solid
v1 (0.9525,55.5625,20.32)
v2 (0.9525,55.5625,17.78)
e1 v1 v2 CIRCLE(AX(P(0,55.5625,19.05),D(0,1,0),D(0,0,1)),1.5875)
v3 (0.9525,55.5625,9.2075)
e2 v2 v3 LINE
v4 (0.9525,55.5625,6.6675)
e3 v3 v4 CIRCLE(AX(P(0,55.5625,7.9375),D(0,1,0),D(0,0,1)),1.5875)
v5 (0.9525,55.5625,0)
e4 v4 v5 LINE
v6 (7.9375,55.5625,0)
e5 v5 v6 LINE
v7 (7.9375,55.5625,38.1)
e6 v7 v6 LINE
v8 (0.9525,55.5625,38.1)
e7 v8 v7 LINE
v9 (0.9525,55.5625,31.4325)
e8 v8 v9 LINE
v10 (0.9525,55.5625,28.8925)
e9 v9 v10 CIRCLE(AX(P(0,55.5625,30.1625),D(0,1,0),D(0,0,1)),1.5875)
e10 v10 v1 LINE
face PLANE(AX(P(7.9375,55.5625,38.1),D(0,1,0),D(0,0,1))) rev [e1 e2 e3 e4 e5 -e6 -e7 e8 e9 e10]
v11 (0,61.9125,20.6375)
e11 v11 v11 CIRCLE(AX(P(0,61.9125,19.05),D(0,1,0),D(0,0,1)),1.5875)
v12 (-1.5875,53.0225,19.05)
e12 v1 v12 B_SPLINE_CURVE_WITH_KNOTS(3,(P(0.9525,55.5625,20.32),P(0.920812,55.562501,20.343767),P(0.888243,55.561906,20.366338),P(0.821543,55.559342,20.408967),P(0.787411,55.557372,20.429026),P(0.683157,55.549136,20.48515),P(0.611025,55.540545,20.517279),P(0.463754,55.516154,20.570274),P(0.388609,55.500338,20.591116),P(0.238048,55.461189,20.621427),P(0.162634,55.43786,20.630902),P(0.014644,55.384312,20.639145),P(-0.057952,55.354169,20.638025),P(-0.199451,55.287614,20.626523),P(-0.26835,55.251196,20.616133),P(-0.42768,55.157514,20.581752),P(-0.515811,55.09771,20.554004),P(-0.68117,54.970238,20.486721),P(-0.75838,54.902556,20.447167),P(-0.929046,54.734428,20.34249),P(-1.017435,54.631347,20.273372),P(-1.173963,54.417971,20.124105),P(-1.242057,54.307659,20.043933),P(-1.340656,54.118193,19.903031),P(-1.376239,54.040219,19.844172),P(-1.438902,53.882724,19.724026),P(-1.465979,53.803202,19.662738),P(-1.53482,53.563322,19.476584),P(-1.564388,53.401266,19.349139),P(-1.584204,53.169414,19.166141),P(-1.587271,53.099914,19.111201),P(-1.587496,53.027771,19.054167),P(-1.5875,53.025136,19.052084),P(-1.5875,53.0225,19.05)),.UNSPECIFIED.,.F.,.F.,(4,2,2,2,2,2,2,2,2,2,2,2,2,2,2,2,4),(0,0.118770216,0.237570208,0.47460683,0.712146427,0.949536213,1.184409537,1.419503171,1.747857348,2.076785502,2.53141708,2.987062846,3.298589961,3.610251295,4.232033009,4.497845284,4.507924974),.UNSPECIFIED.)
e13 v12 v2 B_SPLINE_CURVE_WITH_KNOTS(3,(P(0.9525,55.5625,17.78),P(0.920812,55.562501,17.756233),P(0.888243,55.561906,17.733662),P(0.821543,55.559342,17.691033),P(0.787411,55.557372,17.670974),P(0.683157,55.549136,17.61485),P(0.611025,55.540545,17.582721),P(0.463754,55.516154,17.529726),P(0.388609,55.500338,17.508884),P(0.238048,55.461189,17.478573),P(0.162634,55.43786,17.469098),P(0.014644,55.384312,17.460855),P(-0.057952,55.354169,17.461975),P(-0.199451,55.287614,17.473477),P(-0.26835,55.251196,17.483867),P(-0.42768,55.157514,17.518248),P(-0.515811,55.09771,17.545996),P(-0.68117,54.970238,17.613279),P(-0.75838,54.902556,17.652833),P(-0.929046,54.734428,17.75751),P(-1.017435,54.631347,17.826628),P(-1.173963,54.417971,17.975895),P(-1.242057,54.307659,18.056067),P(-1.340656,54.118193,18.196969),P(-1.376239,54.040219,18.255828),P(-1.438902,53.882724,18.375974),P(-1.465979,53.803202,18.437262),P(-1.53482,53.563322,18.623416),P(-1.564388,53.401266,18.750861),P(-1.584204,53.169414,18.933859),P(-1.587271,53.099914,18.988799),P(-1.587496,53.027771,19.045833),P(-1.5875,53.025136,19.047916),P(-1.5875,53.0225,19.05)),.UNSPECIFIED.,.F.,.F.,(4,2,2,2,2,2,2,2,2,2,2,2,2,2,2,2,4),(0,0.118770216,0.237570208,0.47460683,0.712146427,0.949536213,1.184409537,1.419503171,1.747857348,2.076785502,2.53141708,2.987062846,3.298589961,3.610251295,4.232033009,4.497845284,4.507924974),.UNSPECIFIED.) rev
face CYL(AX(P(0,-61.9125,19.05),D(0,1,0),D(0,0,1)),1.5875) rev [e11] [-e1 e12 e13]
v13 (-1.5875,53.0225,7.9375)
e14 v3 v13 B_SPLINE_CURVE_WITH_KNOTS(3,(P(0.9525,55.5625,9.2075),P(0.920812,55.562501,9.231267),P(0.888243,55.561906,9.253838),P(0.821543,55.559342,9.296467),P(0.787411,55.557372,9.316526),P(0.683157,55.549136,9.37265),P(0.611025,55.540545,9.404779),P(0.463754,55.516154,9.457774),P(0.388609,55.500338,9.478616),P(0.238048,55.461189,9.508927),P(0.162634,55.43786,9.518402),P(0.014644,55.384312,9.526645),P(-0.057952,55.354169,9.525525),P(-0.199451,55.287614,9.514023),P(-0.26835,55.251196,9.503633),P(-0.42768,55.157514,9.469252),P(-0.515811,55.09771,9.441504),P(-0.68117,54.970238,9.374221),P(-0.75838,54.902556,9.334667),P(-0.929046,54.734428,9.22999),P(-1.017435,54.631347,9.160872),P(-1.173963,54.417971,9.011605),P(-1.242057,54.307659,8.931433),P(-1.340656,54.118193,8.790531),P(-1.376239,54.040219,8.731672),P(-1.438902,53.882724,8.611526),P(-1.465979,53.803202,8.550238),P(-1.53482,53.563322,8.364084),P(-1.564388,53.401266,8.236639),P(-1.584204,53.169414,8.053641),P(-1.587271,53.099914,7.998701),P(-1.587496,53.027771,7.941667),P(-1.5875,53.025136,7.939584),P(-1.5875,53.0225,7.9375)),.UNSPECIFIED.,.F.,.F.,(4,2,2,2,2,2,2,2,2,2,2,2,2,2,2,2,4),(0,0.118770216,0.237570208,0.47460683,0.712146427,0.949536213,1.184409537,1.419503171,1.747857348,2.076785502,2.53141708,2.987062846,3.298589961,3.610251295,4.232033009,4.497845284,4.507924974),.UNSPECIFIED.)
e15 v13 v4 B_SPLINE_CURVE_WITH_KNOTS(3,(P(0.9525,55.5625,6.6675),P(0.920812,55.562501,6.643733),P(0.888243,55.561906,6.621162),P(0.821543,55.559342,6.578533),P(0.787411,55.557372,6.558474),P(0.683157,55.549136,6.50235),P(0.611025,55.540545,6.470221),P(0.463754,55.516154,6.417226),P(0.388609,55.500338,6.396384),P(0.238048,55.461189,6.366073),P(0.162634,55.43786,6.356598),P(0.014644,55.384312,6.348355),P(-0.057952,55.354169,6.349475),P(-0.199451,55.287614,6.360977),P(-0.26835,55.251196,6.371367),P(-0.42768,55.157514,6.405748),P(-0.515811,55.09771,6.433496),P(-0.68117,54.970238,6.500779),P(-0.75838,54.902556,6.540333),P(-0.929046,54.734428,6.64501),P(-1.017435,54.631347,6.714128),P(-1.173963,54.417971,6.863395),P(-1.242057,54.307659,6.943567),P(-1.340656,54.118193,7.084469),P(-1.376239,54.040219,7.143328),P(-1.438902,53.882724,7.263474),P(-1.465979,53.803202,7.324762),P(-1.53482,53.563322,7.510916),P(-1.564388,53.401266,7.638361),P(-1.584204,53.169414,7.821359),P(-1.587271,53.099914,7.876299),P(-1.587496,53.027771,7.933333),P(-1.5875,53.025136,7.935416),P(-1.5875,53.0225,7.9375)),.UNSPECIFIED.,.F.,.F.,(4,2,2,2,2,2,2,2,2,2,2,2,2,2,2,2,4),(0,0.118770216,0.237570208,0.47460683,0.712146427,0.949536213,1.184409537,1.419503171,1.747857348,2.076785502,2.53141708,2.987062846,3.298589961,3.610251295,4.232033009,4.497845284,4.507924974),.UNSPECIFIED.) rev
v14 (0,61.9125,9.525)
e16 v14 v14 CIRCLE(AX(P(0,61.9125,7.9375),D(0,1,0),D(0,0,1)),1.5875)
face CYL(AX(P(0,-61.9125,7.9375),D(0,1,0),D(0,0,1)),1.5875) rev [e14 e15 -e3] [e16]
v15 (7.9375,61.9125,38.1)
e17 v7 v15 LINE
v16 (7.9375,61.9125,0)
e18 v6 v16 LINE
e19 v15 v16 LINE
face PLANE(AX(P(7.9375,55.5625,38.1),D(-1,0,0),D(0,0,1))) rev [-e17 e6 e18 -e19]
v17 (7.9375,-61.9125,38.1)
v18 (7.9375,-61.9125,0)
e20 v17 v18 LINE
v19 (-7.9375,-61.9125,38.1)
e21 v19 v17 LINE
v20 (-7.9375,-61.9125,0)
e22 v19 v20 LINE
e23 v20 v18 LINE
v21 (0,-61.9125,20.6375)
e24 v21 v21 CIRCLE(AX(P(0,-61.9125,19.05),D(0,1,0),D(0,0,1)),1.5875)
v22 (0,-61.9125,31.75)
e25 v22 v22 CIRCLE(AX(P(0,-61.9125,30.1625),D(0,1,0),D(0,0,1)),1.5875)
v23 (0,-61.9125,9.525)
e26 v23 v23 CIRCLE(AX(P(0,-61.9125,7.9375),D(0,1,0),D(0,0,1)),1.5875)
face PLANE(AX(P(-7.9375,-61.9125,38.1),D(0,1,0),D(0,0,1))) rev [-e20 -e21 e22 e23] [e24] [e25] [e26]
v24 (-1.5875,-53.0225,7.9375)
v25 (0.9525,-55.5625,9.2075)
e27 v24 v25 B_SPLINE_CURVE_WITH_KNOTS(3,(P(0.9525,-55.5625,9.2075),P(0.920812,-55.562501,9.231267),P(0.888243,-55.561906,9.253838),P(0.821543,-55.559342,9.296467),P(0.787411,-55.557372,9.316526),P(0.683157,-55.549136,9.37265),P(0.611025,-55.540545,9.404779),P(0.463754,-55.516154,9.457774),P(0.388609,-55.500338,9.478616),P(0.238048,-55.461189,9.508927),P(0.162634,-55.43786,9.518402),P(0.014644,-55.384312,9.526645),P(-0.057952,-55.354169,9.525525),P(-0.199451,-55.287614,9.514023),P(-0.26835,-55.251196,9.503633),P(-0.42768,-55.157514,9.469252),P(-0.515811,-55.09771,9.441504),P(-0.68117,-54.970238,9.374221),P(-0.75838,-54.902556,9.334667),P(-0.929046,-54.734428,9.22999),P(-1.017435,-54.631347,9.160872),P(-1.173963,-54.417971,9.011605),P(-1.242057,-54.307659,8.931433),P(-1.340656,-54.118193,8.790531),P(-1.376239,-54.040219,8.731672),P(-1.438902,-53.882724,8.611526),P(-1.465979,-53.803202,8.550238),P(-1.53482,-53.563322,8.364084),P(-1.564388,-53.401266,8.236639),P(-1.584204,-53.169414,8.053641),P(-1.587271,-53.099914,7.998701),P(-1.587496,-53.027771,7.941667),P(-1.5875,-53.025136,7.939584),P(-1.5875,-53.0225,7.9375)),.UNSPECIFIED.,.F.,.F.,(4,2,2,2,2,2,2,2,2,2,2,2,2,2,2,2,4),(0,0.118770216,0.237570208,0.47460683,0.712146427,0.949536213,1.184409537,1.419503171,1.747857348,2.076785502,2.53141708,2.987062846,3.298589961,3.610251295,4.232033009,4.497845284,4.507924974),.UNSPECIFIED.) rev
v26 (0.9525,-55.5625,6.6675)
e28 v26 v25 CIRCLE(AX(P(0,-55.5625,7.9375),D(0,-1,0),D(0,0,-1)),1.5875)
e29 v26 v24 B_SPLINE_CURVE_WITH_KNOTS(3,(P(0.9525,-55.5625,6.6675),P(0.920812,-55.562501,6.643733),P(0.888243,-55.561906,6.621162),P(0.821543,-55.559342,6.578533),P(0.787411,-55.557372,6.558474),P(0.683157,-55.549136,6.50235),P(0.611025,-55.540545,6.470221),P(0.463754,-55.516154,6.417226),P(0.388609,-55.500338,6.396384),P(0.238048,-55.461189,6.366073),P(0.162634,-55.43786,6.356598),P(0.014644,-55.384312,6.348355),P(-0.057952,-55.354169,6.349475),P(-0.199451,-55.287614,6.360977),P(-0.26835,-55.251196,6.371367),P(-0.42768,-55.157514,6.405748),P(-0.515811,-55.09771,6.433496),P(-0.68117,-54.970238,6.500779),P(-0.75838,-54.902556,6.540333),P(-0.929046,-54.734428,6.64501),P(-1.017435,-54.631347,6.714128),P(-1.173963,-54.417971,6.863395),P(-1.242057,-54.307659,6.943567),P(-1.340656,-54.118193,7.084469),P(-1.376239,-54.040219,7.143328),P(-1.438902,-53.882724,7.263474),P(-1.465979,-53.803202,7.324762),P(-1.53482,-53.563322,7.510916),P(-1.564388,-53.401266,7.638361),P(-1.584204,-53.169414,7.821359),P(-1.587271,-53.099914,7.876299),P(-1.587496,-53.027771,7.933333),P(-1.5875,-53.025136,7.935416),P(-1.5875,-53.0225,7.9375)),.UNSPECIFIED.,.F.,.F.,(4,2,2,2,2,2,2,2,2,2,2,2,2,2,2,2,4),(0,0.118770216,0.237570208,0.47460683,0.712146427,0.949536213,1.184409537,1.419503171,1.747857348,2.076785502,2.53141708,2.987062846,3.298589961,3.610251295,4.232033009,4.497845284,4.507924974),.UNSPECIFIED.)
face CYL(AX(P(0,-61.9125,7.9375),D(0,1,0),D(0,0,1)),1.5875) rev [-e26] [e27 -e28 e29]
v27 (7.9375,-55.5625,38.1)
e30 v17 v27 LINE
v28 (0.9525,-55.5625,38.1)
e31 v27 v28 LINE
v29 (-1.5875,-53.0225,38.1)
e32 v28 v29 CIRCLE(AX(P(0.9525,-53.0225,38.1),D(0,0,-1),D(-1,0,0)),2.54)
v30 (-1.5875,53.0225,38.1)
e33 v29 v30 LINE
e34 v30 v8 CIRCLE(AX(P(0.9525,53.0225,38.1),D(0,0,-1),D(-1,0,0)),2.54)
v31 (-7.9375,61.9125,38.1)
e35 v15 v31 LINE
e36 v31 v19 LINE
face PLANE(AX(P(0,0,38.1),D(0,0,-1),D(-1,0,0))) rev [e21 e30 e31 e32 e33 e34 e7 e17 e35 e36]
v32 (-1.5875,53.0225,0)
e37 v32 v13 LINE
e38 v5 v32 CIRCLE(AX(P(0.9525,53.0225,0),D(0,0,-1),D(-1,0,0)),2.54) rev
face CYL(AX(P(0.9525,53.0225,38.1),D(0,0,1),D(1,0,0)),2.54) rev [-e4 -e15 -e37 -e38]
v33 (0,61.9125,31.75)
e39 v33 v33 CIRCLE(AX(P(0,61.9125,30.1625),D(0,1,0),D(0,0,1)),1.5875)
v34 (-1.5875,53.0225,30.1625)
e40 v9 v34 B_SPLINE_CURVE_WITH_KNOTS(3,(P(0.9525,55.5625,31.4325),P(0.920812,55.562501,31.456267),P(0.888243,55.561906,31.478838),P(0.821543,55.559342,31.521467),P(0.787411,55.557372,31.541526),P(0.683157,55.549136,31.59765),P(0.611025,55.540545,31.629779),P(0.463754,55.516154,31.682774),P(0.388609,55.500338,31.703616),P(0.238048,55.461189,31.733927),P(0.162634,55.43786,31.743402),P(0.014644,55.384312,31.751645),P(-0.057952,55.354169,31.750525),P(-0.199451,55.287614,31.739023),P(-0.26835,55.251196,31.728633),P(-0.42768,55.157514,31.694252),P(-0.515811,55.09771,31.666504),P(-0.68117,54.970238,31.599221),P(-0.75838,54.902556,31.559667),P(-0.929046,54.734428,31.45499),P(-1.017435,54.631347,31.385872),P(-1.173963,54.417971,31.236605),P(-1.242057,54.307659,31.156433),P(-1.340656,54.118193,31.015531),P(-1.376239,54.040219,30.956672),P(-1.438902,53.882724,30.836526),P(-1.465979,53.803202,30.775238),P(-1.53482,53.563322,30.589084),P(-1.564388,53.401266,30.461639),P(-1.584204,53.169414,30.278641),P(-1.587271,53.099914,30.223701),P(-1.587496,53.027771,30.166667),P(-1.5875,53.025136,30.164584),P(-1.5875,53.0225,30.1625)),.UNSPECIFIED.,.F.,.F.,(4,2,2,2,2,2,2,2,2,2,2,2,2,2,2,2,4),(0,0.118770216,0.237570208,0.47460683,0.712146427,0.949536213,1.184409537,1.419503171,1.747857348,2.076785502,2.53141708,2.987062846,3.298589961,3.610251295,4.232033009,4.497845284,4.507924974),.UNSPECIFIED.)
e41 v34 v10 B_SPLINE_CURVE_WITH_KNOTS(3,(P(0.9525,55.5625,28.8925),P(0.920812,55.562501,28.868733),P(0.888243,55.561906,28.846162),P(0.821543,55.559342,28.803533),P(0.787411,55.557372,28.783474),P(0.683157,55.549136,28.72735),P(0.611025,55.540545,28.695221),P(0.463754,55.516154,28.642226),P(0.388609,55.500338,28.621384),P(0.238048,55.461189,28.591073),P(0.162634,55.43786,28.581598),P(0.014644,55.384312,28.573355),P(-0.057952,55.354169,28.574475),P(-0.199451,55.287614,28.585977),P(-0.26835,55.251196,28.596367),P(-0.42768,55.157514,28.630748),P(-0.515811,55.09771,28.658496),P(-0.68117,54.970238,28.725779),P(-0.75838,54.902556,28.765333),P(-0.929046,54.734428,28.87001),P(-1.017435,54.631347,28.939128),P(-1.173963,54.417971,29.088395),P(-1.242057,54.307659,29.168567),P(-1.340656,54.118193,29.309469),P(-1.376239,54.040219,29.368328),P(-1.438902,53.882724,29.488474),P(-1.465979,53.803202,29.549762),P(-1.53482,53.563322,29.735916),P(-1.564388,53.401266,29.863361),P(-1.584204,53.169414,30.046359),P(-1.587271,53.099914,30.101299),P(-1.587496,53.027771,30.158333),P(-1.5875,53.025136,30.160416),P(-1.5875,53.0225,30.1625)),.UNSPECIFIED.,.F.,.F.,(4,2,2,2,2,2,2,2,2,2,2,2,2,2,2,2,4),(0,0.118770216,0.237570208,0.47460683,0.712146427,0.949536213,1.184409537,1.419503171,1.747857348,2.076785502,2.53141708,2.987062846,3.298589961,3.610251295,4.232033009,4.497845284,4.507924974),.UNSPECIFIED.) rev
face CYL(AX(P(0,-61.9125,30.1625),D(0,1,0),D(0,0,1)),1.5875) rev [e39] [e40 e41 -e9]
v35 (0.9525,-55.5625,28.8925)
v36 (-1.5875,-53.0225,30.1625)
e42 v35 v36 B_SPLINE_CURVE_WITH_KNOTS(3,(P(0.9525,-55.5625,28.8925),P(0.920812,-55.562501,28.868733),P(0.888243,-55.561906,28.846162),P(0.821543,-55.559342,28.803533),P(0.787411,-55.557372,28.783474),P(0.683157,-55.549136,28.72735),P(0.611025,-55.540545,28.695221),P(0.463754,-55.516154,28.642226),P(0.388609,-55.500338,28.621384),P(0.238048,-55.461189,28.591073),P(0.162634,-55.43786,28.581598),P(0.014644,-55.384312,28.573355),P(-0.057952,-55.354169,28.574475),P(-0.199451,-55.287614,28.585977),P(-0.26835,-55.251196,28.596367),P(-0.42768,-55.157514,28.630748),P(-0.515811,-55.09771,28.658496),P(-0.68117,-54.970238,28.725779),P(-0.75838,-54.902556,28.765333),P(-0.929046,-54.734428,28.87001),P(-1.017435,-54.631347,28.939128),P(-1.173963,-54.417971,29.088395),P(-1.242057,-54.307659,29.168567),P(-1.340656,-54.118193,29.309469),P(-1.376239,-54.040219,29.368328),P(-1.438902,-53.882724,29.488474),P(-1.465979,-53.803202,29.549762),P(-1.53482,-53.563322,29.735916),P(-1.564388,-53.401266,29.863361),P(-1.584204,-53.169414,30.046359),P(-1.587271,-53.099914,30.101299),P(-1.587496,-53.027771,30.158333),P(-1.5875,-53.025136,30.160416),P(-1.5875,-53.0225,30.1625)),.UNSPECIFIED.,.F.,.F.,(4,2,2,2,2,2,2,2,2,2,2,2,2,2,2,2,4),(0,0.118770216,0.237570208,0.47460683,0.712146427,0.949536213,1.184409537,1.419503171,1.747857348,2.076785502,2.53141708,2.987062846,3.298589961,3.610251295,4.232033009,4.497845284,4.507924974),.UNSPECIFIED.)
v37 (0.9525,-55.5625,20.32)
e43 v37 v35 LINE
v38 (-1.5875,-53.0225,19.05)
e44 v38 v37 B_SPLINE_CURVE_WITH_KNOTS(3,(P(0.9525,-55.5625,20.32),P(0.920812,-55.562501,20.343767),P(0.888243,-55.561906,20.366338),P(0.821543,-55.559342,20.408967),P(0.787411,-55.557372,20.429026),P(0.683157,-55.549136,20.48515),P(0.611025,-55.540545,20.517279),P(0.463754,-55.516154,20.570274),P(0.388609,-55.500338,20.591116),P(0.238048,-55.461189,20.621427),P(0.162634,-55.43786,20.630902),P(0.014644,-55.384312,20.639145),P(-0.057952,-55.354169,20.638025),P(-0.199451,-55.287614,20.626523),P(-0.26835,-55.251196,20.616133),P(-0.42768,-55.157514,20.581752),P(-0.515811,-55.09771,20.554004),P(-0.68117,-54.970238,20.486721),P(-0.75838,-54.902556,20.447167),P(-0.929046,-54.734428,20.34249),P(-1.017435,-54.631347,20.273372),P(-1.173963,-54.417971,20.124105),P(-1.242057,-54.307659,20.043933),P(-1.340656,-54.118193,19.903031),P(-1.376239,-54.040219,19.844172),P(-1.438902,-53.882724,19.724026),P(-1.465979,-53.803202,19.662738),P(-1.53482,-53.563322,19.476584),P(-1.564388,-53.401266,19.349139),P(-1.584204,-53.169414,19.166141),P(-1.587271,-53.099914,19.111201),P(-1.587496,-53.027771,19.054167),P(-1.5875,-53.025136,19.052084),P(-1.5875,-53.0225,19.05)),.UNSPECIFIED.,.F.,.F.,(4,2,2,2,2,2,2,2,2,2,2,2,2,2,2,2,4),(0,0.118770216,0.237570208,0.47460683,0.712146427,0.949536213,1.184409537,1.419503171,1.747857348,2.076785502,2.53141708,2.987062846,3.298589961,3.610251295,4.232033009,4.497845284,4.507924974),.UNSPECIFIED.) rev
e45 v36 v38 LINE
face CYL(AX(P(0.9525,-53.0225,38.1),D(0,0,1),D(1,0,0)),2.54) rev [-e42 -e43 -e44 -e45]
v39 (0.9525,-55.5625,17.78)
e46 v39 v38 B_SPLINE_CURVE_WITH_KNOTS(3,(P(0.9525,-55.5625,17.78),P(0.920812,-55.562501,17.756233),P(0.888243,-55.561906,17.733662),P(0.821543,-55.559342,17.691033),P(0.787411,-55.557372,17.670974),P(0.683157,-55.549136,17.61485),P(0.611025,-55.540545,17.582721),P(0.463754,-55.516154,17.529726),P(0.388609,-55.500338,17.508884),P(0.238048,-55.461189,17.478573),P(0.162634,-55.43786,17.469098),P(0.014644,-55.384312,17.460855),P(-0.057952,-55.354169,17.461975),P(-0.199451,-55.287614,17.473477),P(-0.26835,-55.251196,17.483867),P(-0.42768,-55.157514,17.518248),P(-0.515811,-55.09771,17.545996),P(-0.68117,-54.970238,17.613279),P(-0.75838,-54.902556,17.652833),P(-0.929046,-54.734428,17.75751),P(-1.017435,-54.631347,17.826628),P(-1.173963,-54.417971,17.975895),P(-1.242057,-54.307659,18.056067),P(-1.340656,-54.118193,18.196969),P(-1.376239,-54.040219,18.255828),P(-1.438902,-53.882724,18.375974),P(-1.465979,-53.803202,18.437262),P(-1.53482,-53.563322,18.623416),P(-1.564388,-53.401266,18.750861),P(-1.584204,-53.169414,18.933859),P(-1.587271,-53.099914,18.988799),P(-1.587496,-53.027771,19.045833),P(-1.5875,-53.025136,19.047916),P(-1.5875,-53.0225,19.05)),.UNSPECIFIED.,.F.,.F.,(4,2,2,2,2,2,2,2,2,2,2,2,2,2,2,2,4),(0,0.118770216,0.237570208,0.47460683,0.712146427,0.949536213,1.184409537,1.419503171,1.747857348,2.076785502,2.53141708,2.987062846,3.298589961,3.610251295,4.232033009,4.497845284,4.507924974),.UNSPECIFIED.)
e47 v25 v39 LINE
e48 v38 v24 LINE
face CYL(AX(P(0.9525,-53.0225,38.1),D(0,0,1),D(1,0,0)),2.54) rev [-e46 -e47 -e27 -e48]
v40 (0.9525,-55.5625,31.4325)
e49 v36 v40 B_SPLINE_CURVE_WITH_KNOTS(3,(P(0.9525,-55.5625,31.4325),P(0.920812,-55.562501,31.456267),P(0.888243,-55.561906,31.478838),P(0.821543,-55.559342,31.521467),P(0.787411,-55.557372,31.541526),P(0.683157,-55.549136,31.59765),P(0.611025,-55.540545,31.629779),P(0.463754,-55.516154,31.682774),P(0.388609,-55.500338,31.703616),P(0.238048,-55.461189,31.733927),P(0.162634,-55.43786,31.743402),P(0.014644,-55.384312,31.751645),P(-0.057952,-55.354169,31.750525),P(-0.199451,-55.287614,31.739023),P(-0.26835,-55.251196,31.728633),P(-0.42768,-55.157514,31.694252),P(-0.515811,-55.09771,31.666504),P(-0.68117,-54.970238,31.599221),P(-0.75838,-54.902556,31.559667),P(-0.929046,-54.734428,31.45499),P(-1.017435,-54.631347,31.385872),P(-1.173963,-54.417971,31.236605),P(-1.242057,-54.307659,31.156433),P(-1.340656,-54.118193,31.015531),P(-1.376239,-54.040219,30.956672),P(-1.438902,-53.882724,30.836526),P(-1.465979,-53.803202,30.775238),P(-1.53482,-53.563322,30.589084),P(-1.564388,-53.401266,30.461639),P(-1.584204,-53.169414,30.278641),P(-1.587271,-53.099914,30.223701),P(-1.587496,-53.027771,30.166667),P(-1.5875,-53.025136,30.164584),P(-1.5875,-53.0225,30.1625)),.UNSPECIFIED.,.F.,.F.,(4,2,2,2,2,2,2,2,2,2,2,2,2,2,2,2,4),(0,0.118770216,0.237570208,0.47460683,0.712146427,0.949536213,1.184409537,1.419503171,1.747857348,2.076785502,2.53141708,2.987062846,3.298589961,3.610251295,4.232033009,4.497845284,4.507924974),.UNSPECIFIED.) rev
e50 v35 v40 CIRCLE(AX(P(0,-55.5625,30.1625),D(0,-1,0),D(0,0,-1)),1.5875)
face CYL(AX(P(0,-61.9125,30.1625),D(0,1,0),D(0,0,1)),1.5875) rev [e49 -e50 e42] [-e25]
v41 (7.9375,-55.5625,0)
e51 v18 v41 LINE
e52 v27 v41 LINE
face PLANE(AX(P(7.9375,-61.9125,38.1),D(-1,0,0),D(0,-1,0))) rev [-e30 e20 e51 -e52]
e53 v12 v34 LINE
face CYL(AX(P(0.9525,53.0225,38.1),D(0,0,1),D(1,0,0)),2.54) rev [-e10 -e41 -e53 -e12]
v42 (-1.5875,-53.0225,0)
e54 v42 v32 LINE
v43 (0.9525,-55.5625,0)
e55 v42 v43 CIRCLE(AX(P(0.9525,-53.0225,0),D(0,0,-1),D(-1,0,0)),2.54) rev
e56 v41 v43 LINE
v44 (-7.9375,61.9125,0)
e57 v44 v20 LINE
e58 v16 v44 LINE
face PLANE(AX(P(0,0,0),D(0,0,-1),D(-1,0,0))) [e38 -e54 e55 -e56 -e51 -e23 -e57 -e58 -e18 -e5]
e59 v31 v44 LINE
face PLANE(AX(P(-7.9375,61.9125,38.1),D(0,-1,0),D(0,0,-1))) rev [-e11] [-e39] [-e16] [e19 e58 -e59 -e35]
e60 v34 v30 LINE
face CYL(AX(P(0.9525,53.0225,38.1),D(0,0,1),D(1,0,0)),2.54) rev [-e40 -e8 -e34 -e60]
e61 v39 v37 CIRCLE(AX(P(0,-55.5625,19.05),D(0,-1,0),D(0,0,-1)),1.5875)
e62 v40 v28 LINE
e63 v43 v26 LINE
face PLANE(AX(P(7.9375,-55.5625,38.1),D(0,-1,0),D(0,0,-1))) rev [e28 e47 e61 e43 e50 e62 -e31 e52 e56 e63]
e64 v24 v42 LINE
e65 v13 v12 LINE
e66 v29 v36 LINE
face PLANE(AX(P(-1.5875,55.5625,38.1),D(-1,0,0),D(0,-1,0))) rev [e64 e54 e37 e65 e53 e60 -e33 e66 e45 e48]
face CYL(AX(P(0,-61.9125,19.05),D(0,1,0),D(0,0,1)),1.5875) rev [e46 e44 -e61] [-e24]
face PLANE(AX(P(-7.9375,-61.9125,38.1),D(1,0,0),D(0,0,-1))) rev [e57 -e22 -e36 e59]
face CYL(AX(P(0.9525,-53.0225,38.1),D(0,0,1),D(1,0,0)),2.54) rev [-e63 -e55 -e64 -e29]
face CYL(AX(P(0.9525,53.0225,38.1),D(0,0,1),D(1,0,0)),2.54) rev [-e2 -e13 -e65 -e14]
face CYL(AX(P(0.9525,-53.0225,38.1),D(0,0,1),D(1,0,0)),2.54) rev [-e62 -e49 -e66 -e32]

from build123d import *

# Parameters (mm, degrees)
BOSS_EXTRUDE1_DEPTH = 38.1
SKETCH2_R           = 1.5875
CUT_EXTRUDE1_DEPTH  = 130.796935754
FILLET2_R           = 2.54


with BuildPart() as part:
    # Sketch1 → Boss-Extrude1 (new body)
    with BuildSketch(Plane.XY):
        Polygon((-7.9375, -61.9125), (7.9375, -61.9125), (7.9375, -55.5625), (-1.5875, -55.5625), (-1.5875, 55.5625), (7.9375, 55.5625), (7.9375, 61.9125), (-7.9375, 61.9125), align=None)
    extrude(amount=BOSS_EXTRUDE1_DEPTH)

    # Sketch2 → Cut-Extrude1 (cut, through all)
    with BuildSketch(Plane(origin=(0, 61.9125, 0), x_dir=(1, 0, 0), z_dir=(0, 1, 0))):
        with Locations(Location((0, -7.9375, 0), (0, 0, 270))):
            Circle(SKETCH2_R)
        with Locations(Location((0, -19.05, 0), (0, 0, 270))):
            Circle(SKETCH2_R)
        with Locations(Location((0, -30.1625, 0), (0, 0, 270))):
            Circle(SKETCH2_R)
    extrude(amount=-CUT_EXTRUDE1_DEPTH, mode=Mode.SUBTRACT)

    # Fillet2
    # the kernel refuses this fillet: 2.54 mm, written as the material it adds along each edge
    with BuildSketch(Plane(origin=(-1.5875, 55.5625, 30.1625), x_dir=(0, -1, 0), z_dir=(0, 0, 1))) as fillet2_piece_1_section:
        with BuildLine():
            CenterArc((FILLET2_R, FILLET2_R), FILLET2_R, 180, 90)
            Line((0, FILLET2_R), (0, 0))
            Line((0, 0), (FILLET2_R, 0))
        make_face()
    fillet2_piece_1 = extrude(amount=7.9375, mode=Mode.PRIVATE)
    fillet2_piece_1 = fillet2_piece_1 - Plane(origin=(0, 54.97769338, 30.1625), x_dir=(0, 0, 1), z_dir=(0, 1, 0)) * Cylinder(1.5875, 27, mode=Mode.PRIVATE)
    add(fillet2_piece_1)
    with BuildSketch(Plane(origin=(-1.5875, -55.5625, 30.1625), x_dir=(1, 0, 0), z_dir=(0, 0, 1))) as fillet2_piece_2_section:
        with BuildLine():
            CenterArc((FILLET2_R, FILLET2_R), FILLET2_R, 180, 90)
            Line((0, FILLET2_R), (0, 0))
            Line((0, 0), (FILLET2_R, 0))
        make_face()
    fillet2_piece_2 = extrude(amount=7.9375, mode=Mode.PRIVATE)
    fillet2_piece_2 = fillet2_piece_2 - Plane(origin=(0, -54.977693276, 30.1625), x_dir=(0, 0, 1), z_dir=(0, 1, 0)) * Cylinder(1.5875, 27, mode=Mode.PRIVATE)
    add(fillet2_piece_2)
    with BuildSketch(Plane(origin=(-1.5875, 55.5625, 19.05), x_dir=(0, -1, 0), z_dir=(0, 0, 1))) as fillet2_piece_3_section:
        with BuildLine():
            CenterArc((FILLET2_R, FILLET2_R), FILLET2_R, 180, 90)
            Line((0, FILLET2_R), (0, 0))
            Line((0, 0), (FILLET2_R, 0))
        make_face()
    fillet2_piece_3 = extrude(amount=11.1125, mode=Mode.PRIVATE)
    fillet2_piece_3 = fillet2_piece_3 - Plane(origin=(0, 54.968485011, 30.1625), x_dir=(0, 0, 1), z_dir=(0, 1, 0)) * Cylinder(1.5875, 33, mode=Mode.PRIVATE)
    fillet2_piece_3 = fillet2_piece_3 - Plane(origin=(0, 54.968485011, 19.05), x_dir=(0, 0, 1), z_dir=(0, 1, 0)) * Cylinder(1.5875, 33, mode=Mode.PRIVATE)
    add(fillet2_piece_3)
    with BuildSketch(Plane(origin=(-1.5875, 55.5625, 7.9375), x_dir=(0, -1, 0), z_dir=(0, 0, 1))) as fillet2_piece_4_section:
        with BuildLine():
            CenterArc((FILLET2_R, FILLET2_R), FILLET2_R, 180, 90)
            Line((0, FILLET2_R), (0, 0))
            Line((0, 0), (FILLET2_R, 0))
        make_face()
    fillet2_piece_4 = extrude(amount=11.1125, mode=Mode.PRIVATE)
    fillet2_piece_4 = fillet2_piece_4 - Plane(origin=(0, 54.968485011, 19.05), x_dir=(0, 0, 1), z_dir=(0, 1, 0)) * Cylinder(1.5875, 33, mode=Mode.PRIVATE)
    fillet2_piece_4 = fillet2_piece_4 - Plane(origin=(0, 54.968485011, 7.9375), x_dir=(0, 0, 1), z_dir=(0, 1, 0)) * Cylinder(1.5875, 33, mode=Mode.PRIVATE)
    add(fillet2_piece_4)
    with BuildSketch(Plane(origin=(-1.5875, 55.5625, 0), x_dir=(0, -1, 0), z_dir=(0, 0, 1))) as fillet2_piece_5_section:
        with BuildLine():
            CenterArc((FILLET2_R, FILLET2_R), FILLET2_R, 180, 90)
            Line((0, FILLET2_R), (0, 0))
            Line((0, 0), (FILLET2_R, 0))
        make_face()
    fillet2_piece_5 = extrude(amount=7.9375, mode=Mode.PRIVATE)
    fillet2_piece_5 = fillet2_piece_5 - Plane(origin=(0, 54.977693583, 7.9375), x_dir=(0, 0, 1), z_dir=(0, 1, 0)) * Cylinder(1.5875, 27, mode=Mode.PRIVATE)
    add(fillet2_piece_5)
    with BuildSketch(Plane(origin=(-1.5875, -55.5625, 19.05), x_dir=(1, 0, 0), z_dir=(0, 0, 1))) as fillet2_piece_6_section:
        with BuildLine():
            CenterArc((FILLET2_R, FILLET2_R), FILLET2_R, 180, 90)
            Line((0, FILLET2_R), (0, 0))
            Line((0, 0), (FILLET2_R, 0))
        make_face()
    fillet2_piece_6 = extrude(amount=11.1125, mode=Mode.PRIVATE)
    fillet2_piece_6 = fillet2_piece_6 - Plane(origin=(0, -54.968484791, 30.1625), x_dir=(0, 0, 1), z_dir=(0, 1, 0)) * Cylinder(1.5875, 33, mode=Mode.PRIVATE)
    fillet2_piece_6 = fillet2_piece_6 - Plane(origin=(0, -54.968484791, 19.05), x_dir=(0, 0, 1), z_dir=(0, 1, 0)) * Cylinder(1.5875, 33, mode=Mode.PRIVATE)
    add(fillet2_piece_6)
    with BuildSketch(Plane(origin=(-1.5875, -55.5625, 7.9375), x_dir=(1, 0, 0), z_dir=(0, 0, 1))) as fillet2_piece_7_section:
        with BuildLine():
            CenterArc((FILLET2_R, FILLET2_R), FILLET2_R, 180, 90)
            Line((0, FILLET2_R), (0, 0))
            Line((0, 0), (FILLET2_R, 0))
        make_face()
    fillet2_piece_7 = extrude(amount=11.1125, mode=Mode.PRIVATE)
    fillet2_piece_7 = fillet2_piece_7 - Plane(origin=(0, -54.968484789, 19.05), x_dir=(0, 0, 1), z_dir=(0, 1, 0)) * Cylinder(1.5875, 33, mode=Mode.PRIVATE)
    fillet2_piece_7 = fillet2_piece_7 - Plane(origin=(0, -54.968484789, 7.9375), x_dir=(0, 0, 1), z_dir=(0, 1, 0)) * Cylinder(1.5875, 33, mode=Mode.PRIVATE)
    add(fillet2_piece_7)
    with BuildSketch(Plane(origin=(-1.5875, -55.5625, 0), x_dir=(1, 0, 0), z_dir=(0, 0, 1))) as fillet2_piece_8_section:
        with BuildLine():
            CenterArc((FILLET2_R, FILLET2_R), FILLET2_R, 180, 90)
            Line((0, FILLET2_R), (0, 0))
            Line((0, 0), (FILLET2_R, 0))
        make_face()
    fillet2_piece_8 = extrude(amount=7.9375, mode=Mode.PRIVATE)
    fillet2_piece_8 = fillet2_piece_8 - Plane(origin=(0, -54.977693451, 7.9375), x_dir=(0, 0, 1), z_dir=(0, 1, 0)) * Cylinder(1.5875, 27, mode=Mode.PRIVATE)
    add(fillet2_piece_8)


solid = part.part
